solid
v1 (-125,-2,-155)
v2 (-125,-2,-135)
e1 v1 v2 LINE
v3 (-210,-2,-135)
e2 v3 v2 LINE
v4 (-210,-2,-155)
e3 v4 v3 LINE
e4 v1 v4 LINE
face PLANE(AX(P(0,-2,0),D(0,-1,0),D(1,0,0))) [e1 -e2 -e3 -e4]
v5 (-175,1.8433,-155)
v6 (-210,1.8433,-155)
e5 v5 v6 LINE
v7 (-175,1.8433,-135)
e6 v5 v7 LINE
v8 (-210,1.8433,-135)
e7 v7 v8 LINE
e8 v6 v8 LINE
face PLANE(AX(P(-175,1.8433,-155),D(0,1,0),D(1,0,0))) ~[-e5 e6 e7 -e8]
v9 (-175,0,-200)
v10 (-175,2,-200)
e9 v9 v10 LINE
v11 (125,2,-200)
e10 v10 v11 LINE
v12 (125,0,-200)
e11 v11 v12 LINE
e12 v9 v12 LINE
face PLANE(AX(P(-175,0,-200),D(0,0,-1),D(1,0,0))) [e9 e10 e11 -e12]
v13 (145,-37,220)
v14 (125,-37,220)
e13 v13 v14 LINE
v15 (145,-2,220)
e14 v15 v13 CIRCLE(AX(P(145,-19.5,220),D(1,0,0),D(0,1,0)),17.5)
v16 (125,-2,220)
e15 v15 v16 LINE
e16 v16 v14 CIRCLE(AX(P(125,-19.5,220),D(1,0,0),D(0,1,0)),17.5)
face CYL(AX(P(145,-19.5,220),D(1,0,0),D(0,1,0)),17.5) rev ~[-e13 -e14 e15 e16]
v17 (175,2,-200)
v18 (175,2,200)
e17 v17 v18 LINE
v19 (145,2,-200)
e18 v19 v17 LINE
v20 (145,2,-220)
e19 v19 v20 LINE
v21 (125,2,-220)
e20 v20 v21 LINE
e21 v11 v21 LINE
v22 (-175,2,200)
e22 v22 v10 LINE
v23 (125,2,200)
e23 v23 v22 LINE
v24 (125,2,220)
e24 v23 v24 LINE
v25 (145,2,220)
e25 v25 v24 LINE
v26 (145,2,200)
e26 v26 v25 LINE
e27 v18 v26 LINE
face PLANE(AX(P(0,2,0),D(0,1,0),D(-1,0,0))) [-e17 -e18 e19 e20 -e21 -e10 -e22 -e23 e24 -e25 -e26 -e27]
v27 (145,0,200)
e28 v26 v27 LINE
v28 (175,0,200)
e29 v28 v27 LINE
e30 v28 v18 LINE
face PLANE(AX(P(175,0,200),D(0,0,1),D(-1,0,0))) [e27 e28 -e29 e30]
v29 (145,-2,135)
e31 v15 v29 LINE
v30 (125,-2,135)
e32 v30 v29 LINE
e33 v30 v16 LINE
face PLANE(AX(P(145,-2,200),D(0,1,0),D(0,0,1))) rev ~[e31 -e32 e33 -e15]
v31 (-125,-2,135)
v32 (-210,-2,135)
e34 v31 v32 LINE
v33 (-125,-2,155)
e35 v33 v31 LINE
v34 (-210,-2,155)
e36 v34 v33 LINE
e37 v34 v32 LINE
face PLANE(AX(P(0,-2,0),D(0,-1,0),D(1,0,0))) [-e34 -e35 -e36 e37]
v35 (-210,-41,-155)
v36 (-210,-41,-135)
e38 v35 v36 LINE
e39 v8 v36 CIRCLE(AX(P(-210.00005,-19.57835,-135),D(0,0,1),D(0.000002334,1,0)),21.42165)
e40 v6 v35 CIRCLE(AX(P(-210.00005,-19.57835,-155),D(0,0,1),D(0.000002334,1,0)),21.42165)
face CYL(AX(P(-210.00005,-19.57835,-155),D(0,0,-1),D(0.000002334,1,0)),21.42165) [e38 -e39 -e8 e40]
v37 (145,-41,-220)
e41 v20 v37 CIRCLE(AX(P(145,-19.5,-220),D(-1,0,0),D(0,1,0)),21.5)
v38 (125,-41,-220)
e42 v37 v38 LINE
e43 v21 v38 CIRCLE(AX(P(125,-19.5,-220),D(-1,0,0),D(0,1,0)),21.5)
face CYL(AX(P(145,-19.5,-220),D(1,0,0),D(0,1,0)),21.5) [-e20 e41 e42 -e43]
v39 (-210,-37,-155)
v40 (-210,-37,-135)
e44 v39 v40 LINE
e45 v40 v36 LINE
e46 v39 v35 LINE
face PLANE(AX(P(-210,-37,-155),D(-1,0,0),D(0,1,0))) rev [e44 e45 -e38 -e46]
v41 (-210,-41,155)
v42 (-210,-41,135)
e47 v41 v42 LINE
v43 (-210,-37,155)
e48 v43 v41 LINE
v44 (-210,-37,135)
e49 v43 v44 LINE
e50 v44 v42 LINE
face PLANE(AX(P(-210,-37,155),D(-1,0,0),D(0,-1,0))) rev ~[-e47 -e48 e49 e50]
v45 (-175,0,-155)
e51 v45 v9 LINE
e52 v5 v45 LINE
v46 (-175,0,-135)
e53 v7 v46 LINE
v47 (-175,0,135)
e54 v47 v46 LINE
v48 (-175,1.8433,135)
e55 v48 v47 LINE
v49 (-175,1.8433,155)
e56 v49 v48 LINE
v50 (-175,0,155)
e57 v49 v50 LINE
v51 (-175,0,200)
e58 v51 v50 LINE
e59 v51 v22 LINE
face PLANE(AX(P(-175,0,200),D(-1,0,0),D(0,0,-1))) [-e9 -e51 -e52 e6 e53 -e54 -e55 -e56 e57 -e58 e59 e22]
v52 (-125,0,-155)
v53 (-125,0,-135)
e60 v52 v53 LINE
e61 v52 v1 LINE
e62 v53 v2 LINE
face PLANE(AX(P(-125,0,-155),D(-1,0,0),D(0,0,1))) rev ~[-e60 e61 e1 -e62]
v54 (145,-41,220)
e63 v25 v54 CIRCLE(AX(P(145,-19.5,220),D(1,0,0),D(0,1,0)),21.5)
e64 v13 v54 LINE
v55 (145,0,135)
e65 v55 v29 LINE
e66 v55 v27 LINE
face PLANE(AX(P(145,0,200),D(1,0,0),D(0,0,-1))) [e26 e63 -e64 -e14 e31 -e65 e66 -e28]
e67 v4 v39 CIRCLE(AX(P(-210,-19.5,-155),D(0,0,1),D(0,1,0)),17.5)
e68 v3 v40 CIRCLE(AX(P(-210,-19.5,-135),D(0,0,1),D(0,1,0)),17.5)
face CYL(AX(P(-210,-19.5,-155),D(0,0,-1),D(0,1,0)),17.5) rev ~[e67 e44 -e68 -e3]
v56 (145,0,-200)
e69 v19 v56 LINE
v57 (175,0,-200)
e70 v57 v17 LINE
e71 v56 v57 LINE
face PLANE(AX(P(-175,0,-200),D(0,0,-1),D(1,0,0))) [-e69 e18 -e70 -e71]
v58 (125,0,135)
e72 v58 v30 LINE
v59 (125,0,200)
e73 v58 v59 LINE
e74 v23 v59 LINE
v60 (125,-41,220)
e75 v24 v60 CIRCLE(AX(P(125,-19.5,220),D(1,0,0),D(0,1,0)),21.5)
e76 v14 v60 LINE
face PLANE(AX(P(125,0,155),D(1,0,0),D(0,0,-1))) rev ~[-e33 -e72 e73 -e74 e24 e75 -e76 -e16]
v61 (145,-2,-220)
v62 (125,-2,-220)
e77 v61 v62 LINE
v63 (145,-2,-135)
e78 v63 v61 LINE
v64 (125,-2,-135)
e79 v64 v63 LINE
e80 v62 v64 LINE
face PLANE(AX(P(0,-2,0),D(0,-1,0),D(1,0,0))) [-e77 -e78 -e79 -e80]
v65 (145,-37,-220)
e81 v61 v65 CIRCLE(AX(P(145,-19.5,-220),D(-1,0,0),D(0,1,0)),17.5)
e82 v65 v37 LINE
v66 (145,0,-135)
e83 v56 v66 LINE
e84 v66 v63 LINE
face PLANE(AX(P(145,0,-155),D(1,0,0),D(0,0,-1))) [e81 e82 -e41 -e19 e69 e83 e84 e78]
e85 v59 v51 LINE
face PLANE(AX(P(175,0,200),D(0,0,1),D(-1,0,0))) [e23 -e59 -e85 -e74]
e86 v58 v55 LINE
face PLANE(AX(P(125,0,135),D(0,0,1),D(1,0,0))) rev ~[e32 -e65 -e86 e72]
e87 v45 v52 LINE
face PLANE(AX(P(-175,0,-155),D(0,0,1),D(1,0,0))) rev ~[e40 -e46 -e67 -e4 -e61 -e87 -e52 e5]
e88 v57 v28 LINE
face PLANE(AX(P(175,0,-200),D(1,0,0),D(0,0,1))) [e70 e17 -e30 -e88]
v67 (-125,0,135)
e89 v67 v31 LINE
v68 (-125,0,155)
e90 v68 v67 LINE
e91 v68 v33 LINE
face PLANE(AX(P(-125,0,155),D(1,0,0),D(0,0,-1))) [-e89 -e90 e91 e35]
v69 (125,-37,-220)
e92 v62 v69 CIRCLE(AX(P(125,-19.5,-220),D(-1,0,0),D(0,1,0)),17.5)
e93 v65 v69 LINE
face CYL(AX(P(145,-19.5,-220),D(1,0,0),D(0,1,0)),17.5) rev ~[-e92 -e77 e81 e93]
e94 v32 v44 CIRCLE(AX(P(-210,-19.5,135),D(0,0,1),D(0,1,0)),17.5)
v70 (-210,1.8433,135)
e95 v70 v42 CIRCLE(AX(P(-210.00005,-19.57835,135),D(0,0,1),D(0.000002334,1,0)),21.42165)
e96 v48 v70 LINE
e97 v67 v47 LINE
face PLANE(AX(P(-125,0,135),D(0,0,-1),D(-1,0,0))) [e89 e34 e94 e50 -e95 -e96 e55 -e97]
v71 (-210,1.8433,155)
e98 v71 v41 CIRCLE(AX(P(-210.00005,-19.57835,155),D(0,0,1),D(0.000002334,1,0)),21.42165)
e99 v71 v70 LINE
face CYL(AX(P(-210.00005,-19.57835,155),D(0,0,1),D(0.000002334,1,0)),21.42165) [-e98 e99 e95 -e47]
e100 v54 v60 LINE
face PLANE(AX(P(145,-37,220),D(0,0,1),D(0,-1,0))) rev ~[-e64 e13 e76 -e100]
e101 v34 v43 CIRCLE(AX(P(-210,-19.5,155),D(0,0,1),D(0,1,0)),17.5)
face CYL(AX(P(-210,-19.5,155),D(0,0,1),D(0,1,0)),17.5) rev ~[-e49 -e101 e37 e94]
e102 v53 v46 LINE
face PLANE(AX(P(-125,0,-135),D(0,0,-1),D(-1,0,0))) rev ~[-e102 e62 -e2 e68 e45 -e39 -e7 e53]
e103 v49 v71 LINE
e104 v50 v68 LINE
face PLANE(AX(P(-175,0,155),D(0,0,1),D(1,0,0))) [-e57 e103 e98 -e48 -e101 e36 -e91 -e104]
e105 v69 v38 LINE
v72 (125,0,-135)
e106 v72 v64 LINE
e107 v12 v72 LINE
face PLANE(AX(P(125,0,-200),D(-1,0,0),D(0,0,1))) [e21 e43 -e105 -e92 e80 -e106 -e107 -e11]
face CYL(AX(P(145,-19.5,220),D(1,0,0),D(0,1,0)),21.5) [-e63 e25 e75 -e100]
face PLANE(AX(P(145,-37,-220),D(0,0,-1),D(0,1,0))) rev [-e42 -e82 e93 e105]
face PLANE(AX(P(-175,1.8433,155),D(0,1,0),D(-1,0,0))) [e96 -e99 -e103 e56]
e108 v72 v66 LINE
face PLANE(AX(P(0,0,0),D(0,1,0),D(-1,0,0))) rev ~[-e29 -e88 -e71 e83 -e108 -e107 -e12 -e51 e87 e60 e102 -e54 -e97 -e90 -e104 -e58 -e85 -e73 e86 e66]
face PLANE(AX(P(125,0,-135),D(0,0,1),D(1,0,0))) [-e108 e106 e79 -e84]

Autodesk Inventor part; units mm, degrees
ref_plane "YZ Plane" through (0, 0, 0) normal (1, 0, 0) x (0, 1, 0)
ref_plane "XZ Plane" through (0, 0, 0) normal (0, 1, 0) x (-1, 0, 0)
ref_plane "XY Plane" through (0, 0, 0) normal (0, 0, 1) x (1, 0, 0)
sketch "Sketch1" plane through (0, 0, 0) normal (0, 1, 0) x (-1, 0, 0)
  line L0 (-175, 200) -> (175, 200)
  line L1 (175, 200) -> (175, -200)
  line L2 (175, -200) -> (-175, -200)
  line L3 (-175, -200) -> (-175, 200)
  line L4 (-175, 200) -> (175, -200) construction
  line L5 (175, 200) -> (-175, -200) construction
  point P0 (0, 0)
  point P1 (0, 0)
  dimension "d0" = 350
  dimension "d1" = 400
extrude "Extrusion1" add sketch "Sketch1" along normal blind 2
sketch "Sketch2" plane through (0, 0, 0) normal (0, -1, 0) x (1, 0, 0)
  line L0 (175, 200) -> (175, -200) construction
  line L1 (-175, 200) -> (175, 200) construction
  line L2 (175, 155) -> (125, 155)
  line L3 (125, 155) -> (125, 135)
  line L4 (125, 135) -> (175, 135)
  line L5 (175, 135) -> (175, 155)
  line L6 (0, 0) -> (119.5058, 0) construction
  line L7 (175, -155) -> (125, -155)
  line L8 (125, -155) -> (125, -135)
  line L9 (125, -135) -> (175, -135)
  line L10 (175, -135) -> (175, -155)
  line L11 (175, -200) -> (-175, -200) construction
  line L12 (0, 0) -> (0, 102.1582) construction
  line L13 (-175, 155) -> (-125, 155)
  line L14 (-125, 155) -> (-125, 135)
  line L15 (-125, 135) -> (-175, 135)
  line L16 (-175, 135) -> (-175, 155)
  line L17 (-175, -155) -> (-125, -155)
  line L18 (-125, -155) -> (-125, -135)
  line L19 (-125, -135) -> (-175, -135)
  line L20 (-175, -135) -> (-175, -155)
  line L21 (125, 135) -> (145, 135)
  line L22 (145, 135) -> (145, 200)
  line L23 (145, 200) -> (125, 200)
  line L24 (125, 200) -> (125, 135)
  line L25 (125, -135) -> (145, -135)
  line L26 (145, -135) -> (145, -200)
  line L27 (145, -200) -> (125, -200)
  line L28 (125, -200) -> (125, -135)
  point P0 (150, 155)
  point P1 (150, -155)
  point P2 (-150, 155)
  point P3 (-150, -155)
  dimension "d4" = 50
  dimension "d5" = 20
  dimension "d6" = 45
  dimension "d9" = 20
  dimension "d10" = 20
extrude "Extrusion2" add sketch "Sketch2" along normal blind 2 contours L22 L4 L3 L2 | L2 L24 L23 L22 | L26 L27 L28 L7 | L7 L8 L9 L26 | L13 L14 L15 L16 | L20 L19 L18 L17
sketch "Sketch3" plane through (145, 0, 200) normal (1, 0, 0) x (0, 0, -1)
  line L0 (400, 2) -> (0, 2) construction
  line L1 (0, 2) -> (-20, 2)
  line L2 (0, -2) -> (-20, -2)
  line L3 (-20, -2) -> (-20, 2)
  arc A0 (-20, -2) -> (-20, -37) centre (-20, -19.5) ccw
  line L4 (-20, -2) -> (-20, -37) construction
  line L5 (-20, -2) -> (15, -2) construction
  arc A1 (-20, 2) -> (-20, -41) centre (-20, -19.5) ccw
  line L6 (-20, 2) -> (-20, -44.4597)
  line L7 (0, 2) -> (0, -2)
  point P0 (200, 0)
  point P1 (-20, -41)
  point P2 (-20, -37)
  dimension "d11" = 20
  dimension "d12" = 35
  dimension "d13" = 90
  dimension "d14" = 4
extrude "Extrusion3" add sketch "Sketch3" against normal up to surface (20 mm away) contours L7 L2 L3 L1 | L3 A0 L6 A1
mirror "Mirror1" about plane through (0, 0, 0) normal (0, 0, 1) of "Extrusion3"
sketch "Sketch4" plane through (-175, 0, 155) normal (0, 0, 1) x (1, 0, 0)
  line L0 (139.9111, 57.1289) -> (-260.0889, 57.1289) construction
  line L1 (0, 1.8433) -> (-35, 1.8433)
  line L2 (0, -2) -> (-35, -2)
  line L3 (-35, -2) -> (-35, 1.8433)
  arc A0 (-35, -2) -> (-35, -37) centre (-35, -19.5) ccw
  line L4 (-35, -2) -> (-35, -37) construction
  line L5 (-280.0889, 53.1289) -> (-245.0889, 53.1289) construction
  arc A1 (-35, 1.8433) -> (-35, -41) centre (-35, -19.5784) ccw
  line L6 (-35, 1.8433) -> (-35, -44.4597)
  line L7 (0, 1.8433) -> (0, -2)
  point P0 (175, 0)
  point P1 (-60.0889, 55.1289)
  point P2 (-280.0889, 14.1289)
  point P3 (-280.0889, 18.1289)
  point P4 (-35, -37)
  point P5 (-35, -2)
  point P6 (-35, -2)
  dimension "d17" = 35
  dimension "d18" = 35
  dimension "d19" = 90
  dimension "d20" = 4
extrude "Extrusion4" add sketch "Sketch4" against normal up to surface (20 mm away) contours L7 L2 L3 L1 | L3 A0 L6 A1
mirror "Mirror2" about plane through (0, 0, 0) normal (0, 0, 1) of "Extrusion4"
